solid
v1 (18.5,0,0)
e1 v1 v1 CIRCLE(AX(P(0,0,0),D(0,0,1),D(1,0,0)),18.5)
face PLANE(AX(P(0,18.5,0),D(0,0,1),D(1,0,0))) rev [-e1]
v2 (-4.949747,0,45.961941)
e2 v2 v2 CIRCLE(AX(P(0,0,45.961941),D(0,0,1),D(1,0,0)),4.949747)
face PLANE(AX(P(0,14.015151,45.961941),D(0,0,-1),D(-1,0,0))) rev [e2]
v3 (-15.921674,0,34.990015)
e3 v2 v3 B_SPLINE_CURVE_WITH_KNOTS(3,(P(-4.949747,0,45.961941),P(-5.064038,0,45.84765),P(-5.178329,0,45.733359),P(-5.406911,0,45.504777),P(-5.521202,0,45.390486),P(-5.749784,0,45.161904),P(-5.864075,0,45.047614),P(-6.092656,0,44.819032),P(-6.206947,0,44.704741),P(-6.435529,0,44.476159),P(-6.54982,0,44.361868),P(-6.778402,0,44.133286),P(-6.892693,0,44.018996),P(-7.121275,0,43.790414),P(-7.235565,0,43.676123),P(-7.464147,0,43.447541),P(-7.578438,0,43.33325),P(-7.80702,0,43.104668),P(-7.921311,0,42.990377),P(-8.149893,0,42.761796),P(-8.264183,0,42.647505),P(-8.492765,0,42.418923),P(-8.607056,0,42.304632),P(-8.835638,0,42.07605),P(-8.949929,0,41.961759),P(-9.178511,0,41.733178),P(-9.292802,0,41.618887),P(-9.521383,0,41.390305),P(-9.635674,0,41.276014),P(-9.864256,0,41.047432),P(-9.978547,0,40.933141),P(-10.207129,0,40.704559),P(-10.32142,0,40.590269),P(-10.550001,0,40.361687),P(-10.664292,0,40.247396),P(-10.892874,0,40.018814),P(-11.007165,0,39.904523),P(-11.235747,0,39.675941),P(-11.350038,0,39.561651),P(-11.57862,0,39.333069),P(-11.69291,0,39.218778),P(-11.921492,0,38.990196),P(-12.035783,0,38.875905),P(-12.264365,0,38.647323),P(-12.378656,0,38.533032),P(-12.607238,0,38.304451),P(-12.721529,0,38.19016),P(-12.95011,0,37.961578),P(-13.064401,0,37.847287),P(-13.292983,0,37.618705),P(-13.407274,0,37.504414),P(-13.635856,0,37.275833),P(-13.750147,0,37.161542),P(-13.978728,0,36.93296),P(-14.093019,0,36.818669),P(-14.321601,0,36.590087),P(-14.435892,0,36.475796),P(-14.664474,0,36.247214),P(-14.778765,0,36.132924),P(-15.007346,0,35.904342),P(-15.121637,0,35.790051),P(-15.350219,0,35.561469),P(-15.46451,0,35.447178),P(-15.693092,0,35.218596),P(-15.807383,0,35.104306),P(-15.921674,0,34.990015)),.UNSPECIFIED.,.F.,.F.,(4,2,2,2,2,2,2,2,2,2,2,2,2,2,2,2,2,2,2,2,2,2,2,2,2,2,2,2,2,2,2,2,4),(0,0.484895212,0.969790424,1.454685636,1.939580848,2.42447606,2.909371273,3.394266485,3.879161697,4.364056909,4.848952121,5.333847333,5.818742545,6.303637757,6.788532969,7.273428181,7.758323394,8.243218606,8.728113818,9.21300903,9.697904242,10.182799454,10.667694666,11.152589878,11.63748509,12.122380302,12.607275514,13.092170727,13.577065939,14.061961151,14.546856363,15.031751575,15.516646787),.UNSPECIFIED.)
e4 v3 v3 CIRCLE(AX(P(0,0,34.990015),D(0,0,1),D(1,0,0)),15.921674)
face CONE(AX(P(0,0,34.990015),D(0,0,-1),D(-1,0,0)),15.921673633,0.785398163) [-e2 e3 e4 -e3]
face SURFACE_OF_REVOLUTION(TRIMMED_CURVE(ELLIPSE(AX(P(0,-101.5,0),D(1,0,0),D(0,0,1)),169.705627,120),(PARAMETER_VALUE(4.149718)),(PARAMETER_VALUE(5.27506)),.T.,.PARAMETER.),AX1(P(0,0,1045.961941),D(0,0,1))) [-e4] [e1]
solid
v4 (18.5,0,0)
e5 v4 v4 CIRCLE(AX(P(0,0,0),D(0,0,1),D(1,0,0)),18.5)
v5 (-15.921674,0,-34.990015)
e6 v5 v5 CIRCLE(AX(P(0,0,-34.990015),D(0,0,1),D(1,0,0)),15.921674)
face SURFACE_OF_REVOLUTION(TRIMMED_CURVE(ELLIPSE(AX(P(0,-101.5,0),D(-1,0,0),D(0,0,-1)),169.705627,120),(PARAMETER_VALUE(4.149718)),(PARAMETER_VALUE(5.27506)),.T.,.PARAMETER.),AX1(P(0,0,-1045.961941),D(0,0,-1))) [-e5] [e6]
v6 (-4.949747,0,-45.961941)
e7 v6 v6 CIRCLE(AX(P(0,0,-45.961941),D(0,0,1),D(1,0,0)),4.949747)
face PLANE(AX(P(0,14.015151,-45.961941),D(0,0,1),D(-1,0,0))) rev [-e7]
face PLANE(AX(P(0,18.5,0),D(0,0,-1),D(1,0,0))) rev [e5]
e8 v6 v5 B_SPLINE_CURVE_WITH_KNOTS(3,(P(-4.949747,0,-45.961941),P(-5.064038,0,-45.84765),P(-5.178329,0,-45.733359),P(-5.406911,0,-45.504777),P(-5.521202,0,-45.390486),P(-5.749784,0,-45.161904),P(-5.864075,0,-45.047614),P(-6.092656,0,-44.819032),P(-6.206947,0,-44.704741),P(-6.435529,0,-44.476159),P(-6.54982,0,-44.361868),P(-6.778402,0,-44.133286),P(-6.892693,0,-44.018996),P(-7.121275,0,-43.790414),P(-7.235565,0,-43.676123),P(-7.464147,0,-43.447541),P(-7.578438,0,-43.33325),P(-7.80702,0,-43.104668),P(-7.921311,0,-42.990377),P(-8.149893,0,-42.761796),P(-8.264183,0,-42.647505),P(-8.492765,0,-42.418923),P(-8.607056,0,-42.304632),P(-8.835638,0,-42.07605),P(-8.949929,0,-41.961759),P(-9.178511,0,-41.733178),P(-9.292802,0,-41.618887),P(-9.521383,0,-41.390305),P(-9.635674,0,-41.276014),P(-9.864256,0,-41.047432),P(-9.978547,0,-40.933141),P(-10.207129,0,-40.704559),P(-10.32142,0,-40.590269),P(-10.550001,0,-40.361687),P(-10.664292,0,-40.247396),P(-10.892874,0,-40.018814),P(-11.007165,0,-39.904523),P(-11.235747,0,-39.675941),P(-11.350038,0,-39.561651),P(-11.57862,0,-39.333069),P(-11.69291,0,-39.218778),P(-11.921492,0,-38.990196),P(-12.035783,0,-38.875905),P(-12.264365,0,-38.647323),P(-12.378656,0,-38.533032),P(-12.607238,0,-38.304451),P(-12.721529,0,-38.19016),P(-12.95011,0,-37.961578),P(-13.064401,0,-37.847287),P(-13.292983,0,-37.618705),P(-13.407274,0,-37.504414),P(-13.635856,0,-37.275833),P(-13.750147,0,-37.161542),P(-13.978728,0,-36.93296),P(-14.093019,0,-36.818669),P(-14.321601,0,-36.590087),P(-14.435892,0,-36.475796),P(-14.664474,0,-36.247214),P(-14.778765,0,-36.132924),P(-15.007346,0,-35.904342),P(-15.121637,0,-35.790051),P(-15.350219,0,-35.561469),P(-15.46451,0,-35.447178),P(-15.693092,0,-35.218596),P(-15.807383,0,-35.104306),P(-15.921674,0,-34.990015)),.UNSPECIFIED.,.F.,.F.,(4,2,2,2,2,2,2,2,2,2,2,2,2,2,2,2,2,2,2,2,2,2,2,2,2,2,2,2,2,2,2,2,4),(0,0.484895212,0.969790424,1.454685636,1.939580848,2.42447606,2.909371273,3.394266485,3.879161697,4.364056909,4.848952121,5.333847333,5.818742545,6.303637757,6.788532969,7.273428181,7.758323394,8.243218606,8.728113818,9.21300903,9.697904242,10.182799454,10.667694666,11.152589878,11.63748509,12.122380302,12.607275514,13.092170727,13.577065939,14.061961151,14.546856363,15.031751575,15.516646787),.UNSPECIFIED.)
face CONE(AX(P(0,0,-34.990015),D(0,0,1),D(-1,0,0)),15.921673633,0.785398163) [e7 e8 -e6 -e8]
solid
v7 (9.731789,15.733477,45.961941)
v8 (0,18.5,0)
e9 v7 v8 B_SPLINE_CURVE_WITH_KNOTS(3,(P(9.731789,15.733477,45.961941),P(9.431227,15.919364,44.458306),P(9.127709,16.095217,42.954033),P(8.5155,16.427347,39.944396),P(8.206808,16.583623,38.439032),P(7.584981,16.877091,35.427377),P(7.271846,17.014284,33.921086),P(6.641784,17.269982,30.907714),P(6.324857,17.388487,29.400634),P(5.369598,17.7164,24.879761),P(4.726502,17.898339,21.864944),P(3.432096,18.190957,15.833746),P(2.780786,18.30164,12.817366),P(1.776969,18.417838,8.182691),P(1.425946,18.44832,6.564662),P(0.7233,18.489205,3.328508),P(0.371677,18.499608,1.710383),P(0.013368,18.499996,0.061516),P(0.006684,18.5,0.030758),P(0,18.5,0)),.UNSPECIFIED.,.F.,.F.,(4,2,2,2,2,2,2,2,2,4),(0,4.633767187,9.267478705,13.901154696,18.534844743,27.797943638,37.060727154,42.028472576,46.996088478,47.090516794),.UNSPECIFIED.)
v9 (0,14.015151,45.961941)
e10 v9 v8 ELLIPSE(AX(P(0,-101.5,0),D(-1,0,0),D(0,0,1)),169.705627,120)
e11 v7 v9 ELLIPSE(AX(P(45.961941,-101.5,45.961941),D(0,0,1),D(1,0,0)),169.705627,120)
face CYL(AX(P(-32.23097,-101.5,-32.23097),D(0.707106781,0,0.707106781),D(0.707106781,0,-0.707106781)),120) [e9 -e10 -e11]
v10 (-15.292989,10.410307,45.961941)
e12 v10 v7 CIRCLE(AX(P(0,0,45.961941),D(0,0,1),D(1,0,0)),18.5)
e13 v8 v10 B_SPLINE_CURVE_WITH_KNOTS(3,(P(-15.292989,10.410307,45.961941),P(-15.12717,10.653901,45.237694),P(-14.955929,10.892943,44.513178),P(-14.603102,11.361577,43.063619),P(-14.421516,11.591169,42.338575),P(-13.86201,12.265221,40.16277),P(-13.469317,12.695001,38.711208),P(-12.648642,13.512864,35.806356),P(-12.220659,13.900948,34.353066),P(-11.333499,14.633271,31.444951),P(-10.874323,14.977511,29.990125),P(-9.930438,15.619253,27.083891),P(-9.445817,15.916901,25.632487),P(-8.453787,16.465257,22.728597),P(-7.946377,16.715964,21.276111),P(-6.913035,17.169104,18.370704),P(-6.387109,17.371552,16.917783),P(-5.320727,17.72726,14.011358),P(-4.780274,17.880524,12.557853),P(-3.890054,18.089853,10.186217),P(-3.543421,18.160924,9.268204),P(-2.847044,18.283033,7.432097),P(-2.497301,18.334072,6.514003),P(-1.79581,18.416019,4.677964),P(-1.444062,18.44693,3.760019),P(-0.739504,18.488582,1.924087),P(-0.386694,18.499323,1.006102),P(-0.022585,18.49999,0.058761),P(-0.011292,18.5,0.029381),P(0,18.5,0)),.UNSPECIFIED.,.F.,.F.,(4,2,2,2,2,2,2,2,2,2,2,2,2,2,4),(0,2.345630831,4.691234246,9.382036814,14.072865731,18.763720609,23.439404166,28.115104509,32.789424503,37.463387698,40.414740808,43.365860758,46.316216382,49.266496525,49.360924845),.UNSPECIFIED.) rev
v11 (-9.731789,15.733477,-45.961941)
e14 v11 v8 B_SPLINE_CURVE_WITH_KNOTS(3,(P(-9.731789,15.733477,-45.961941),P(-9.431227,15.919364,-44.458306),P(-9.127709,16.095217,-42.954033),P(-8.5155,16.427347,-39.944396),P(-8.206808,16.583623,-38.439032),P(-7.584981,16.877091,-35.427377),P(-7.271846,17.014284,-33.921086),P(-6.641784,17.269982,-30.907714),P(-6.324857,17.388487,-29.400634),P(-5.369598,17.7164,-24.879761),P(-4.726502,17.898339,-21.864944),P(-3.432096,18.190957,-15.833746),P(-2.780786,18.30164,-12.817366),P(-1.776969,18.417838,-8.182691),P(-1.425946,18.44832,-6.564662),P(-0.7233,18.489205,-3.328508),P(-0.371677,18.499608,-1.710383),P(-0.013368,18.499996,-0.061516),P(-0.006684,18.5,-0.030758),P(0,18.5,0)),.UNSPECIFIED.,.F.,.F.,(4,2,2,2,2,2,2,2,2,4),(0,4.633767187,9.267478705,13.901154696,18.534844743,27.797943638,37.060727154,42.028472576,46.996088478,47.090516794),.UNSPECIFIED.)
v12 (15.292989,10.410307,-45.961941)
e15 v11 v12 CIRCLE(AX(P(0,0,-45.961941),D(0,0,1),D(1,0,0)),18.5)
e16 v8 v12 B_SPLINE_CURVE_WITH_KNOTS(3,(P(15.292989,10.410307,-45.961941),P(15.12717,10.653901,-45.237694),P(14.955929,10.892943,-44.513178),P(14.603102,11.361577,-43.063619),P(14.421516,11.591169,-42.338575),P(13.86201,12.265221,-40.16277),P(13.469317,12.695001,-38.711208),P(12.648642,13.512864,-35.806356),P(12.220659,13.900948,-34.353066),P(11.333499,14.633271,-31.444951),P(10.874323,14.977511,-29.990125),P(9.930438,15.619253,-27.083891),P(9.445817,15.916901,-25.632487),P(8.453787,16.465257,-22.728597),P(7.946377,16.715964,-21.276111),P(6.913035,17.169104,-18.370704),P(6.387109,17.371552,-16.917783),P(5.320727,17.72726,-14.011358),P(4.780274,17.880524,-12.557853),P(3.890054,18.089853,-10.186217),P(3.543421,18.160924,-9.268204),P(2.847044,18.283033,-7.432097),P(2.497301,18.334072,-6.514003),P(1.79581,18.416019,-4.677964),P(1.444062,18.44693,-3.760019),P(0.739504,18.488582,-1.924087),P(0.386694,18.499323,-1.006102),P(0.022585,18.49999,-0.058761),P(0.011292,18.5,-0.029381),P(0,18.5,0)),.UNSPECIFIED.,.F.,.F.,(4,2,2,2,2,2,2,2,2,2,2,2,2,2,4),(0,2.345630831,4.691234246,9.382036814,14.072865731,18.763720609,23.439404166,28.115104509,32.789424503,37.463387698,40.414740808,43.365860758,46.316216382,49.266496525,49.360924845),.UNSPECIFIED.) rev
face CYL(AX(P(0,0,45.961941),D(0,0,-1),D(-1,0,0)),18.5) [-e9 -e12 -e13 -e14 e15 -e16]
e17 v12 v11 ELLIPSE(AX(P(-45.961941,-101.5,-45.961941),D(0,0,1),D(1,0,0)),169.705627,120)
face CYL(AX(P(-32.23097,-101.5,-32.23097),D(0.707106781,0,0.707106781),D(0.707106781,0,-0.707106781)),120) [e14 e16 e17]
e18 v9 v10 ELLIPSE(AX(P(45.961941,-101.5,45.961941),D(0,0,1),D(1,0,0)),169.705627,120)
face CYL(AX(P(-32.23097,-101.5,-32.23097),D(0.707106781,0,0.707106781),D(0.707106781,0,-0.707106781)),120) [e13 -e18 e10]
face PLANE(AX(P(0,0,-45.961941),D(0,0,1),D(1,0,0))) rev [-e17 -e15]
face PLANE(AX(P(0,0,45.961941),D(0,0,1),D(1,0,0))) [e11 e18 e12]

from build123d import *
from OCP.BRepAlgoAPI import BRepAlgoAPI_Cut
from OCP.TopTools import TopTools_ListOfShape

# Parameters (mm, degrees)
EXTRUDE_1_DEPTH      = 45.961941
EXTRUDE_1_DEPTH_BACK = 45.961941
SKETCH_1_R           = 18.5
CUT_EXTRUDE_START    = -55.581475552
CUT_EXTRUDE_1_DEPTH  = 91.162951004


with BuildPart() as part:
    # Эскиз1 → Бобышка-Вытянуть1 (new, two sides: drawn at the far end of the back side and taken through both)
    with BuildSketch(Plane.XY.offset(-EXTRUDE_1_DEPTH_BACK)):
        Circle(SKETCH_1_R)
    extrude(amount=EXTRUDE_1_DEPTH + EXTRUDE_1_DEPTH_BACK)


with BuildPart() as cut_extrude_1_tool:
    # Вырез-Вытянуть1: read off the stored shape, not the designer's step
    # Вырез-Вытянуть1 outline → Вырез-Вытянуть1 (new body)
    with BuildSketch(Plane(origin=(7.071067812, -101.5, 7.071067812), x_dir=(0.7071067811865488, 0, -0.7071067811865464), z_dir=(0.7071067811865464, 0, 0.7071067811865488)).offset(CUT_EXTRUDE_START)):
        with BuildLine():
            ThreePointArc((0, 120), (22.031377282, 117.960240823), (43.313776165, 111.910306917))
            Line((43.313776165, 111.910306917), (45, 111.257670679))
            Line((45, 111.257670679), (45, 122))
            Line((45, 122), (-45, 122))
            Line((-45, 122), (-45, 111.257670679))
            Line((-45, 111.257670679), (-43.313776165, 111.910306917))
            ThreePointArc((-43.313776165, 111.910306917), (-22.031377282, 117.960240823), (0, 120))
        make_face()
    extrude(amount=CUT_EXTRUDE_1_DEPTH)


with BuildPart() as part_1:
    add(part.part)

    # Вырез-Вытянуть1: cut by cut_extrude_1_tool, with a tolerance
    cut_extrude_1_stock = TopTools_ListOfShape()
    cut_extrude_1_stock.Append(part_1.part.wrapped)
    cut_extrude_1_tools = TopTools_ListOfShape()
    cut_extrude_1_tools.Append(cut_extrude_1_tool.part.wrapped)
    cut_extrude_1_cut = BRepAlgoAPI_Cut()
    cut_extrude_1_cut.SetArguments(cut_extrude_1_stock)
    cut_extrude_1_cut.SetTools(cut_extrude_1_tools)
    cut_extrude_1_cut.SetFuzzyValue(0.00001)
    cut_extrude_1_cut.Build()
    add(Compound.cast(cut_extrude_1_cut.Shape()).solids(), mode=Mode.REPLACE)


with BuildPart() as body_2:
    # Эскиз5 → Повернуть1 (revolve)
    with BuildSketch(Plane(origin=(0, 0, 0), x_dir=(0, 0, -1), z_dir=(1, 0, 0))):
        with BuildLine():
            Line((-45.961940777, 14.015150521), (-45.961940777, 0))
            Line((-45.961940777, 0), (0, 0))
            Line((0, 0), (0, 18.5))
            add(Edge.make_bspline(
                [(0, 18.5), (-23.418590613, 18.5), (-45.961940777, 14.015150521)],
                knots=[4.71238898, 4.71238898, 4.71238898, 4.986647594, 4.986647594, 4.986647594], degree=2, weights=[1, 0.990612501, 1]))
        make_face()
    revolve(axis=Axis((0, 0, 1045.961940777), (0, 0, -1)))

    # Эскиз6 → Вырез-Повернуть1 (revolve, cut)
    with BuildSketch(Plane(origin=(0, 0, 0), x_dir=(1, 0, 0), z_dir=(0, 1, 0)), mode=Mode.PRIVATE) as cut_revolve_1_sk:
        with BuildLine():
            Line((4.949747468, -45.961940777), (15.921673633, -34.990014613))
            add(Edge.make_bspline(
                [(14.015150521, -45.961940777), (15.097613594, -40.520878777), (15.921673633, -34.990014613)],
                knots=[1.296537713, 1.296537713, 1.296537713, 1.36312621, 1.36312621, 1.36312621], degree=2, weights=[1, 0.999445798, 1]))
            Line((14.015150521, -45.961940777), (4.949747468, -45.961940777))
        make_face()
    revolve(cut_revolve_1_sk.sketch.rotate(Axis((0, 0, 1000), (0, 0, -1)), 180), axis=Axis((0, 0, 1000), (0, 0, -1)), mode=Mode.SUBTRACT)


with BuildPart() as body_3:
    # Зеркальное отражение1: mirrored copy
    add(body_2.part.mirror(Plane(origin=(0, 18.5, 0), x_dir=(1, 0, 0), z_dir=(0, 0, 1))))


solid = Compound([part_1.part, body_2.part, body_3.part])
